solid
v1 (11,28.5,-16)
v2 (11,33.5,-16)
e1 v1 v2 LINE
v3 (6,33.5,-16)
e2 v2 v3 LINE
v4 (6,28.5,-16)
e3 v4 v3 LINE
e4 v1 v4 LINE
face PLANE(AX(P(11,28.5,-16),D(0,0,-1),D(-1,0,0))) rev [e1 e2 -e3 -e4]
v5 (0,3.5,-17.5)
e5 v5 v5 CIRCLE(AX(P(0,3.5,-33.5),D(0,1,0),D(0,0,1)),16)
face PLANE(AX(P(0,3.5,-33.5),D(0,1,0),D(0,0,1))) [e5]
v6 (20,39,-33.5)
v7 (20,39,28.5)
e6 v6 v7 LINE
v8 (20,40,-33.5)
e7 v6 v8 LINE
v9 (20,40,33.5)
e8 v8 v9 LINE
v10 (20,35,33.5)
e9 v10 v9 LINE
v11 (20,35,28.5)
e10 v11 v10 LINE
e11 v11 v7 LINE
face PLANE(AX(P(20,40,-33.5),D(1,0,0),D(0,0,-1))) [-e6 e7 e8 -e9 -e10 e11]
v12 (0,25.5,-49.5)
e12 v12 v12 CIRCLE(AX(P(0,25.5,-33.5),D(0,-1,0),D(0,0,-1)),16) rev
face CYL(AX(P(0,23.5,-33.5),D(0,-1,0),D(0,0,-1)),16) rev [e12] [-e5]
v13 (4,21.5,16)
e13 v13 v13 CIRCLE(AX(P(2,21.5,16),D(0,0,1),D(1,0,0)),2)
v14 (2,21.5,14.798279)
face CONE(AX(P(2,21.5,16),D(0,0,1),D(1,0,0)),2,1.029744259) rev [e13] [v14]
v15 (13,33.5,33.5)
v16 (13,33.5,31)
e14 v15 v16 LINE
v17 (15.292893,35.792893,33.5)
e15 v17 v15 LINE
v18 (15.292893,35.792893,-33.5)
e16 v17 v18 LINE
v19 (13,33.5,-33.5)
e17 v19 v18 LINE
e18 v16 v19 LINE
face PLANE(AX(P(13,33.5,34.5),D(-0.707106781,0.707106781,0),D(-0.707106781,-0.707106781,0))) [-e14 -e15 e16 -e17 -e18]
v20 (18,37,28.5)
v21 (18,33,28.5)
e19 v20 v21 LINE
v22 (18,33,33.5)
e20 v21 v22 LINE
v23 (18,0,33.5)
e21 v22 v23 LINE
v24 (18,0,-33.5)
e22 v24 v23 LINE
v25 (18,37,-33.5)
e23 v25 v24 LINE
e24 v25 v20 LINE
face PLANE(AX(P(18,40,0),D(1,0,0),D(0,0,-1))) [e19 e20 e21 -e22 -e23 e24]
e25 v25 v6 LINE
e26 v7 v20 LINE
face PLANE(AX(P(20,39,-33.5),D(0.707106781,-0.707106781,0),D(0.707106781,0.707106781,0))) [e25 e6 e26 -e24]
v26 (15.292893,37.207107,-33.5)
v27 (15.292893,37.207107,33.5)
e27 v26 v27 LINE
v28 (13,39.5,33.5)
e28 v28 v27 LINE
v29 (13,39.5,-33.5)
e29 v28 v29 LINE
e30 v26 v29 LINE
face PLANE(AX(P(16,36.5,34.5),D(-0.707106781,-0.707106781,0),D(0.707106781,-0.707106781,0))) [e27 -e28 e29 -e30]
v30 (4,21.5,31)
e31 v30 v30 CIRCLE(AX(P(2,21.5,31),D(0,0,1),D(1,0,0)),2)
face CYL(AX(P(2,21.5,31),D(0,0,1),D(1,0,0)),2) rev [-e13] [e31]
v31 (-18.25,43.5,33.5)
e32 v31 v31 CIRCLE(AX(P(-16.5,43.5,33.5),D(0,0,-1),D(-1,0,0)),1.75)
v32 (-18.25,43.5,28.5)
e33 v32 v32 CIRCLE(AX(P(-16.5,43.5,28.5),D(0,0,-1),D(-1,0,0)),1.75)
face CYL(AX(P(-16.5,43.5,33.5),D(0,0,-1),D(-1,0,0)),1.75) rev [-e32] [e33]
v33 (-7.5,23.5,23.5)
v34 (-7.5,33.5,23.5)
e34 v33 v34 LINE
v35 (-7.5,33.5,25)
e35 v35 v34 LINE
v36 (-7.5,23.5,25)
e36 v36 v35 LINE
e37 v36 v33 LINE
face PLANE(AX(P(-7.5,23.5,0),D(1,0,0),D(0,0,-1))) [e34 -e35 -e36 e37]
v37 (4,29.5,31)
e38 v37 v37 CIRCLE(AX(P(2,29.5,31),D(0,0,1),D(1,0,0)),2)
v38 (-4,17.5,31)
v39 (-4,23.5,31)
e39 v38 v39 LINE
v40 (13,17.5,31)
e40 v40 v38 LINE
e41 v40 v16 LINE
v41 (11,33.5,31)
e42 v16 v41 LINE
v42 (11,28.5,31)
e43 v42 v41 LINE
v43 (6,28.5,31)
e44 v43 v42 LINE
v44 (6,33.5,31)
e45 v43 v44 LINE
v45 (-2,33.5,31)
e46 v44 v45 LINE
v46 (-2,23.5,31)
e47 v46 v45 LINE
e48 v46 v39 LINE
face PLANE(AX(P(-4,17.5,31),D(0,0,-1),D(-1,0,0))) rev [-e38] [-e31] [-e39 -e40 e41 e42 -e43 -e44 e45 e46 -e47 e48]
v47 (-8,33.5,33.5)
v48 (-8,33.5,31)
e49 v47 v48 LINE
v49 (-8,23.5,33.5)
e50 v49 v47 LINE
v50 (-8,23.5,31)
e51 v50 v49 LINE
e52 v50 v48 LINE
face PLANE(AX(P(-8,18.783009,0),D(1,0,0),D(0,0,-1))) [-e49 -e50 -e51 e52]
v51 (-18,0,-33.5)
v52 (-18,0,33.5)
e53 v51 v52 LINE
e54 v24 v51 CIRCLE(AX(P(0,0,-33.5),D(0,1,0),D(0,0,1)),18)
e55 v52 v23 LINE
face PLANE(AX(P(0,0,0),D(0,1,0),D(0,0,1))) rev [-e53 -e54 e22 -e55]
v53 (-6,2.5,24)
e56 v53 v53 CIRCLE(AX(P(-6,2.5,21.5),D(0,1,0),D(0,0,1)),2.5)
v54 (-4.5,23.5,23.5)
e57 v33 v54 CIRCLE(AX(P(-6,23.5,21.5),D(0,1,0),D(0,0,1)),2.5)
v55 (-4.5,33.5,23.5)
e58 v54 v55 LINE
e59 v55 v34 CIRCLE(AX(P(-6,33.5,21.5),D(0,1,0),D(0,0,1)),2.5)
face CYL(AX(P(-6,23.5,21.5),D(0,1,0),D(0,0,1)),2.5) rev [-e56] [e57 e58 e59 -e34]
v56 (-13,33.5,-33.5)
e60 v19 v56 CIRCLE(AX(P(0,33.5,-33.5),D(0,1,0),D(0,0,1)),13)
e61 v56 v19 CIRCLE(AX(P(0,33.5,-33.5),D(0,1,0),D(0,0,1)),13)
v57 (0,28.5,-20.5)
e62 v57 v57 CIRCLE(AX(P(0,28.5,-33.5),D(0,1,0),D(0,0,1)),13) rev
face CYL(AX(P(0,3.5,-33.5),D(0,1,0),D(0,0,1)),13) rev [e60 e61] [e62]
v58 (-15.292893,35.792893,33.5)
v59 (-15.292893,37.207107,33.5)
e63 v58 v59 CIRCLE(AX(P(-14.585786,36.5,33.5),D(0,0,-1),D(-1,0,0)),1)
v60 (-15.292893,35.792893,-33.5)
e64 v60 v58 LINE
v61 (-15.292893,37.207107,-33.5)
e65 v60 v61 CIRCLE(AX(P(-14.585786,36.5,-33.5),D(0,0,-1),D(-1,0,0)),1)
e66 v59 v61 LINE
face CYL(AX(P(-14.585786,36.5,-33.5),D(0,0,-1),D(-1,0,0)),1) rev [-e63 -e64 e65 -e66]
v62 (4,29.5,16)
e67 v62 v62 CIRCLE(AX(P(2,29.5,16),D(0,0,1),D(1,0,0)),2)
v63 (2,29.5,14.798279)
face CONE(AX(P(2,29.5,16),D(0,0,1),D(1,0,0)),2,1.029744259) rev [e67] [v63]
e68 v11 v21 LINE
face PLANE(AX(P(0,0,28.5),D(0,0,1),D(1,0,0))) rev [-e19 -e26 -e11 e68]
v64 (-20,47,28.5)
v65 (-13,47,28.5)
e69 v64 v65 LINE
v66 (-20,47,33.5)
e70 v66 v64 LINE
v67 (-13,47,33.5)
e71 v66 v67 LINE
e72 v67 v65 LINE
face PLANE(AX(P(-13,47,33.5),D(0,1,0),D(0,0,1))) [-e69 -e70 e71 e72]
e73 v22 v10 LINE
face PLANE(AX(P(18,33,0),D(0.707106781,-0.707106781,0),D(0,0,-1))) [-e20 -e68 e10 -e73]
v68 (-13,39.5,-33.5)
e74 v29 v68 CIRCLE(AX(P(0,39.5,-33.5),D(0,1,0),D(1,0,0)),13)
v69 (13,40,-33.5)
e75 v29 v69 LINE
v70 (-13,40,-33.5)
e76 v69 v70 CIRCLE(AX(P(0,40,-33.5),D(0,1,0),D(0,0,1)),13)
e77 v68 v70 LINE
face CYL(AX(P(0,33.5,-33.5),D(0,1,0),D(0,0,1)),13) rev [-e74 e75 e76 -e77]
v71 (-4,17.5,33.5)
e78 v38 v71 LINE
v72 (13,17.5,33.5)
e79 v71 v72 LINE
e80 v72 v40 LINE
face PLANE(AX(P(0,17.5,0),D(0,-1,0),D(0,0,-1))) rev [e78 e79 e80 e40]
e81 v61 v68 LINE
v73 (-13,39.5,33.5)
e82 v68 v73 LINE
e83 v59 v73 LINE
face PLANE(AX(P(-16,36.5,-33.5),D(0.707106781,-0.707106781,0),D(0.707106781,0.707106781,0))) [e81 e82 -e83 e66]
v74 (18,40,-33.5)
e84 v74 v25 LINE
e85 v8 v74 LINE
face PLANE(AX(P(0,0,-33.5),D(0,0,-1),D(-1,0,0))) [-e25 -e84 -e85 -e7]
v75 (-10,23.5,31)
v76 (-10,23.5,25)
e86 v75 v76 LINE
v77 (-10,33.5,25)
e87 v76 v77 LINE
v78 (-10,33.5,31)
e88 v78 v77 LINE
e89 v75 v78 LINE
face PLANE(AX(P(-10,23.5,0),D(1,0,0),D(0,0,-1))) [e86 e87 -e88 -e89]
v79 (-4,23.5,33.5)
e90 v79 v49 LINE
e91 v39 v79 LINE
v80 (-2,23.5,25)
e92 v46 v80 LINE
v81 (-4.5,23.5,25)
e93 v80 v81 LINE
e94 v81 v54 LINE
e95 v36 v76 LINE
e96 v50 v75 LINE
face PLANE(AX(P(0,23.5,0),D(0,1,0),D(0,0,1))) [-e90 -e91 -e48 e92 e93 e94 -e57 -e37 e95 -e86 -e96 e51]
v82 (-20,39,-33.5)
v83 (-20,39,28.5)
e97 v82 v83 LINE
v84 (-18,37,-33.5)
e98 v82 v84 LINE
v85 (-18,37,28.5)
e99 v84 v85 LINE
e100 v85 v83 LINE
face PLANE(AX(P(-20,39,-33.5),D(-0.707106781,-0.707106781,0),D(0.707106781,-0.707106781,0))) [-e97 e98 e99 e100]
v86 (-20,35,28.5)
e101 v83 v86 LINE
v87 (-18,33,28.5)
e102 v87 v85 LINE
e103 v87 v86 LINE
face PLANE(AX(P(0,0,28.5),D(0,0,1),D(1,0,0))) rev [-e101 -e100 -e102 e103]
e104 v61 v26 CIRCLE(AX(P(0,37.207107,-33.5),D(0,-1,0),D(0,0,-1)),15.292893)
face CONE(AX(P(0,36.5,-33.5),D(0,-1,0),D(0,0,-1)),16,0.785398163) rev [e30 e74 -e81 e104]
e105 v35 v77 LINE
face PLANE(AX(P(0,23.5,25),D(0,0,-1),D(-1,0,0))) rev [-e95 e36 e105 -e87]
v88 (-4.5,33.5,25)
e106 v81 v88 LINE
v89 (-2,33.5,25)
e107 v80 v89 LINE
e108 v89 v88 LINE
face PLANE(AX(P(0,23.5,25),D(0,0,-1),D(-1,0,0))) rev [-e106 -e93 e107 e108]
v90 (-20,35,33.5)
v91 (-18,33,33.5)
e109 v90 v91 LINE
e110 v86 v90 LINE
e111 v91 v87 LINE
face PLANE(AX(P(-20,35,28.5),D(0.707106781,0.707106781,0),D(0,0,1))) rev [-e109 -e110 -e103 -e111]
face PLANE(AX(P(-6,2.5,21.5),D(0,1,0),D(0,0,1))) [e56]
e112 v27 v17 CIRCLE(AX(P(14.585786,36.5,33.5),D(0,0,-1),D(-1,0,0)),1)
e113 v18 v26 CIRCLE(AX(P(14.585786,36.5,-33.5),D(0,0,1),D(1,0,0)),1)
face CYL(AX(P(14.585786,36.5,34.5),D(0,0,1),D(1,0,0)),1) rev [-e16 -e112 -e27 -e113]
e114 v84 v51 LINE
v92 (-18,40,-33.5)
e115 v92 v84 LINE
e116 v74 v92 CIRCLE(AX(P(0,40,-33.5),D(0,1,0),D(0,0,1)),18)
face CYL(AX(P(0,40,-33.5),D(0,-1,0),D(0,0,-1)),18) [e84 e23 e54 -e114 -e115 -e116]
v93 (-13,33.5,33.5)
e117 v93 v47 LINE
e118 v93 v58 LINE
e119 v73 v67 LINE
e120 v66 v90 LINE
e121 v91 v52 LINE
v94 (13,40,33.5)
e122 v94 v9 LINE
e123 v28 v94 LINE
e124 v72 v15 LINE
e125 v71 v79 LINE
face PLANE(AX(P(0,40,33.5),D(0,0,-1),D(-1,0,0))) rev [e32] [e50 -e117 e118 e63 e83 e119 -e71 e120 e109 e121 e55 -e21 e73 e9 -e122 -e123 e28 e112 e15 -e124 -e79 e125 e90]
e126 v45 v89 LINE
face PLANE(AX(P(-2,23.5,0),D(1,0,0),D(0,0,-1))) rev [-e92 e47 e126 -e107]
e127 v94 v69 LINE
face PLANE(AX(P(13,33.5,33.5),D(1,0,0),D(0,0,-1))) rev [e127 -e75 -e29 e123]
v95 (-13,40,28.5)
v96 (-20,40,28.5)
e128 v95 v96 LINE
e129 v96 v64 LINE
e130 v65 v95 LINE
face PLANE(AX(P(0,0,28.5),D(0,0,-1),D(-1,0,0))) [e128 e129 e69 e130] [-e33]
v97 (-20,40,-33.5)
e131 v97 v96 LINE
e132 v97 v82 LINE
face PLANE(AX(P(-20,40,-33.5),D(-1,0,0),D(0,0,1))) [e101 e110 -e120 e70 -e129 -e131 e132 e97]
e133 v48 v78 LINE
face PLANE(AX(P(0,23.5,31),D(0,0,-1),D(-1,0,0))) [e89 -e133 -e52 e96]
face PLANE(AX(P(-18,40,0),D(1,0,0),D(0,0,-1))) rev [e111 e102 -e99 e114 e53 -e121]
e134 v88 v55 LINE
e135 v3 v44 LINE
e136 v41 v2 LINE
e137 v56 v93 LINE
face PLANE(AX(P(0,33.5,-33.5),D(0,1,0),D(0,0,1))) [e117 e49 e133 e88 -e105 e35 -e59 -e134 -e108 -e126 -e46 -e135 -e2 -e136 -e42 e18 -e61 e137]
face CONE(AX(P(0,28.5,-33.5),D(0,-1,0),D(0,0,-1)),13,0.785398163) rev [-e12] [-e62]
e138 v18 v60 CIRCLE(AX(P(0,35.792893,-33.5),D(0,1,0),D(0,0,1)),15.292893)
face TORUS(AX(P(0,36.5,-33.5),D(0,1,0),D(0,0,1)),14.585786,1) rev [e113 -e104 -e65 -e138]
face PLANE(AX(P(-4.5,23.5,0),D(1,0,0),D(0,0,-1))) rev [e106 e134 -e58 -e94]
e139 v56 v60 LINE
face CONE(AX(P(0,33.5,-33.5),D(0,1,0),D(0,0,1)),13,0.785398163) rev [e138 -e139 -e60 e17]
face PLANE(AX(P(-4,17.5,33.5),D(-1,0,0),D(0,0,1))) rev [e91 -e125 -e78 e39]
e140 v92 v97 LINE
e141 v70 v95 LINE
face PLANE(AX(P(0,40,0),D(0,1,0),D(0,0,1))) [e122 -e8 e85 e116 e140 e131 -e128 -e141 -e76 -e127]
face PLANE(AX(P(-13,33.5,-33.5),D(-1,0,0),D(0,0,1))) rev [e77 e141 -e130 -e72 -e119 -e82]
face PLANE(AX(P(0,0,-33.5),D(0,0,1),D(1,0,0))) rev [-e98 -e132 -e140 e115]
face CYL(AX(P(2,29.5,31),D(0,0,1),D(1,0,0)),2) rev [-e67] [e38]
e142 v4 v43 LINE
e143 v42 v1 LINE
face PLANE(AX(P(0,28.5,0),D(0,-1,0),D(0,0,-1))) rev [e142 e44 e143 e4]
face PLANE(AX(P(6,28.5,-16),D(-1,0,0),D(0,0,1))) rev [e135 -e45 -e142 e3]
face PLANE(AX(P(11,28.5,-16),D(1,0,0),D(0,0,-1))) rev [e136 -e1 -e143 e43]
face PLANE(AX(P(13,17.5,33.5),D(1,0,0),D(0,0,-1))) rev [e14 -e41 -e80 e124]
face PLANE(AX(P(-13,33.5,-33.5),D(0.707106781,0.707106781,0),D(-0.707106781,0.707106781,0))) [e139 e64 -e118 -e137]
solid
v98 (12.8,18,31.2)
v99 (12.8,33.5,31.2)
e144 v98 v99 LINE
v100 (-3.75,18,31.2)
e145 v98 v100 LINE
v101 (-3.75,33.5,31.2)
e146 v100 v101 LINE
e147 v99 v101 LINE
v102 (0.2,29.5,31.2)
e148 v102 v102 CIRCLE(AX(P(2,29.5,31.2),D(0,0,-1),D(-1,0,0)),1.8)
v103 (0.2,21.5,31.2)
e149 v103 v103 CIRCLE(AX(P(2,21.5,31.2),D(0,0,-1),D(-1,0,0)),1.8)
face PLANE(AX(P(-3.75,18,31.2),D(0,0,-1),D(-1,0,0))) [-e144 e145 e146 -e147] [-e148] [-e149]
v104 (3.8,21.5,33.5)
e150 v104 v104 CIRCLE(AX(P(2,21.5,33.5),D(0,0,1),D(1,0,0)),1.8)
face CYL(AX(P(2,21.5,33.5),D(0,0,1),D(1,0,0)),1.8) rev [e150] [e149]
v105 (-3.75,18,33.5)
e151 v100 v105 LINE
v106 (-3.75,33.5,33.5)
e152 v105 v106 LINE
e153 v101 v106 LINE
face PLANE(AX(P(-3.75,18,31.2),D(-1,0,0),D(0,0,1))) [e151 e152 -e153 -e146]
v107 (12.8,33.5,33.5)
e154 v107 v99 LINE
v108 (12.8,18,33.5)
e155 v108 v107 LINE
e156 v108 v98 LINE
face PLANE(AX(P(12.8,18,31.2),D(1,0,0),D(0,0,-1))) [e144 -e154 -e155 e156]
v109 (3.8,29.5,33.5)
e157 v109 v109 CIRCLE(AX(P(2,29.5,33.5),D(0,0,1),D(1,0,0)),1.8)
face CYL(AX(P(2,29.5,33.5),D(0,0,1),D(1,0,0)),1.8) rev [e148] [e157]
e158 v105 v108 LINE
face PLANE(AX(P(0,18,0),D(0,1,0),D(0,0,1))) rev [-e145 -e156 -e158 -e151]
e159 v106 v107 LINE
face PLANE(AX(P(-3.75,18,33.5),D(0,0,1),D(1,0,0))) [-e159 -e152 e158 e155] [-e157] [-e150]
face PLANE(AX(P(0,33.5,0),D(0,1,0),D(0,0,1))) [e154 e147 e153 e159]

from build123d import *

# Parameters (mm, degrees)
DODANIE_WYCI_GNI_CIE1_DEPTH         = 40
WYTNIJ_WYCI_GNI_CIE1_DEPTH          = 6.5
SZKIC6_R                            = 13
WYTNIJ_WYCI_GNI_CIE2_DEPTH          = 30
SZKIC7_R                            = 16
WYTNIJ_WYCI_GNI_CIE4_DEPTH          = 20
SFAZOWANIE1_SIZE                    = 5
SZKIC8_W                            = 5
SZKIC8_H                            = 47
WYTNIJ_WYCI_GNI_CIE5_DEPTH          = 5
ZAOKR_GLENIE2_R                     = 1
SZKIC10_W                           = 8
SZKIC10_H                           = 6
WYTNIJ_WYCI_GNI_CIE6_DEPTH          = 10
SZKIC26_R                           = 2.5
WYTNIJ_WYCI_GNI_CIE10_DEPTH         = 21
SZKIC12_W                           = 4
SZKIC12_H                           = 2.5
WYTNIJ_WYCI_GNI_CIE8_DEPTH          = 10
DODANIE_WYCI_GNI_CIE2_DEPTH         = 67
SZKIC17_W                           = 17
SZKIC17_H                           = 2.5
WYTNIJ_WYCI_GNI_CIE9_DEPTH          = 16
OTWORY_USTALAJ_CE_4_0MM5_D          = 4
OTWORY_USTALAJ_CE_4_0MM5_DEPTH      = 15
OTWORY_USTALAJ_CE_4_0MM5_TIP        = 1.201721238
SZKIC23_W                           = 16.55
SZKIC23_H                           = 2.3
DODANIE_WYCI_GNI_CIE4_DEPTH         = 15.5
OTWORY_USTALAJ_CE_4_0MM6_AT_2_COUNT = 2
OTWORY_USTALAJ_CE_4_0MM6_AT_2_PITCH = 8
DODANIE_WYCI_GNI_CIE5_DEPTH         = 5
SFAZOWANIE2_SIZE                    = 2
SZKIC29_W                           = 7
SZKIC29_H                           = 7
SZKIC29_R                           = 1.75
DODANIE_WYCI_GNI_CIE6_DEPTH         = 5


# Some blends are built 0.0001 mm under size
with BuildPart() as part:
    # Szkic1 → Dodanie-wyciągnięcie1 (new body)
    with BuildSketch(Plane(origin=(0, 0, 0), x_dir=(1, 0, 0), z_dir=(0, 1, 0))):
        with BuildLine():
            ThreePointArc((18, 33.5), (0, 15.5), (-18, 33.5))
            Line((-18, 33.5), (-18, -33.5))
            Line((-18, -33.5), (18, -33.5))
            Line((18, -33.5), (18, 33.5))
        make_face()
        with BuildLine():
            ThreePointArc((18, 33.5), (0, 51.5), (-18, 33.5))
            Line((-18, 33.5), (18, 33.5))
        make_face()
        with BuildLine():
            Line((18, 33.5), (-18, 33.5))
            ThreePointArc((-18, 33.5), (0, 15.5), (18, 33.5))
        make_face()
    extrude(amount=DODANIE_WYCI_GNI_CIE1_DEPTH)

    # Szkic2 → Wytnij-wyciągnięcie1 (cut)
    with BuildSketch(Plane(origin=(0, 40, 0), x_dir=(1, 0, 0), z_dir=(0, 1, 0))):
        with BuildLine():
            Line((-13, -33.5), (13, -33.5))
            Line((13, -33.5), (13, 33.5))
            ThreePointArc((13, 33.5), (0, 46.5), (-13, 33.5))
            Line((-13, 33.5), (-13, -33.5))
        make_face()
    extrude(amount=-WYTNIJ_WYCI_GNI_CIE1_DEPTH, mode=Mode.SUBTRACT)

    # Wycięcie-wyciągnięcie po ścieżce1: sweep along a path in Szkic5
    with BuildLine(Plane(origin=(0, 40, 0), x_dir=(1, 0, 0), z_dir=(0, 1, 0))) as wyci_cie_wyci_gni_cie_po_cie_ce1_path:
        Line((13, -33.5), (13, 33.5))
        ThreePointArc((13, 33.5), (0, 46.5), (-13, 33.5))
        Line((-13, 33.5), (-13, -33.5))
    # Szkic4 → Wycięcie-wyciągnięcie po ścieżce1 (sweep, cut)
    with BuildSketch(Plane.XY.offset(33.5)):
        Polygon((13, 33.5), (16, 36.5), (13, 39.5), align=None)
    sweep(path=wyci_cie_wyci_gni_cie_po_cie_ce1_path.line, mode=Mode.SUBTRACT)

    # Szkic6 → Wytnij-wyciągnięcie2 (cut)
    with BuildSketch(Plane(origin=(0, 33.5, 0), x_dir=(1, 0, 0), z_dir=(0, 1, 0))):
        with Locations(Location((0, 33.5, 0), (0, 0, 270))):
            Circle(SZKIC6_R)
    extrude(amount=-WYTNIJ_WYCI_GNI_CIE2_DEPTH, mode=Mode.SUBTRACT)

    # Szkic7 → Wytnij-wyciągnięcie4 (cut)
    with BuildSketch(Plane(origin=(0, 3.5, 0), x_dir=(1, 0, 0), z_dir=(0, 1, 0))):
        with Locations(Location((0, 33.5, 0), (0, 0, 270))):
            Circle(SZKIC7_R)
    extrude(amount=WYTNIJ_WYCI_GNI_CIE4_DEPTH, mode=Mode.SUBTRACT)

    # Sfazowanie1
    # the kernel refuses this chamfer: 5 mm, written as the material it takes off along each edge
    with BuildSketch(Plane(origin=(0, 23.5, -33.5), x_dir=(0, 0, 1), z_dir=(-1, 0, 0))) as sfazowanie1_piece_1_section:
        Polygon((13, SFAZOWANIE1_SIZE), (13 + SFAZOWANIE1_SIZE, 0), (13, 0), align=None)
    sfazowanie1_piece_1 = revolve(axis=Axis((0, 23.5, -33.5), (0, 1, 0)), mode=Mode.PRIVATE)
    sfazowanie1_piece_1 = sfazowanie1_piece_1 & Plane(origin=(0, 26.999564764, -33.5), x_dir=(0, 0, 1), z_dir=(0, -1, 0)) * Cylinder(16, 72, mode=Mode.PRIVATE)
    add(sfazowanie1_piece_1, mode=Mode.SUBTRACT)

    # Szkic8 → Wytnij-wyciągnięcie5 (cut)
    with BuildSketch(Plane(origin=(0, 33.5, 0), x_dir=(1, 0, 0), z_dir=(0, 1, 0))):
        with Locations((8.5, -7.5)):
            Rectangle(SZKIC8_W, SZKIC8_H)
    extrude(amount=-WYTNIJ_WYCI_GNI_CIE5_DEPTH, mode=Mode.SUBTRACT)

    # Zaokrąglenie2
    zaokr_glenie2_edges = [part.edges().sort_by_distance(p)[0] for p in [
        (16, 36.5, 0),
        (0, 36.5, -49.5),
        (-16, 36.5, 0),
    ]]
    fillet(zaokr_glenie2_edges, radius=ZAOKR_GLENIE2_R)

    # Szkic10 → Wytnij-wyciągnięcie6 (cut)
    with BuildSketch(Plane(origin=(0, 33.5, 0), x_dir=(1, 0, 0), z_dir=(0, 1, 0))):
        with Locations((-6, -28)):
            Rectangle(SZKIC10_W, SZKIC10_H)
        with BuildLine():
            ThreePointArc((-7.5, -23.5), (-6, -24), (-4.5, -23.5))
            Line((-4.5, -23.5), (-7.5, -23.5))
        make_face()
        with BuildLine():
            Line((-7.5, -23.5), (-4.5, -23.5))
            ThreePointArc((-4.5, -23.5), (-3.763932023, -22.618033989), (-3.5, -21.5))
            ThreePointArc((-3.5, -21.5), (-7.118033989, -19.263932023), (-7.5, -23.5))
        make_face()
        with BuildLine():
            Line((-7.5, -25), (-4.5, -25))
            Line((-4.5, -25), (-4.5, -23.5))
            ThreePointArc((-4.5, -23.5), (-6, -24), (-7.5, -23.5))
            Line((-7.5, -23.5), (-7.5, -25))
        make_face()
    extrude(amount=-WYTNIJ_WYCI_GNI_CIE6_DEPTH, mode=Mode.SUBTRACT)

    # Szkic26 → Wytnij-wyciągnięcie10 (cut)
    with BuildSketch(Plane(origin=(0, 23.5, 0), x_dir=(1, 0, 0), z_dir=(0, 1, 0))):
        with Locations(Location((-6, -21.5, 0), (0, 0, 270))):
            Circle(SZKIC26_R)
    extrude(amount=-WYTNIJ_WYCI_GNI_CIE10_DEPTH, mode=Mode.SUBTRACT)

    # Szkic12 → Wytnij-wyciągnięcie8 (cut)
    with BuildSketch(Plane(origin=(0, 33.5, 0), x_dir=(1, 0, 0), z_dir=(0, 1, 0))):
        with Locations((-6, -32.25)):
            Rectangle(SZKIC12_W, SZKIC12_H)
    extrude(amount=-WYTNIJ_WYCI_GNI_CIE8_DEPTH, mode=Mode.SUBTRACT)

    # Szkic13 → Dodanie-wyciągnięcie2 (add)
    with BuildSketch(Plane.XY.offset(33.5)):
        Polygon((-18, 40), (-20, 40), (-20, 39), (-18, 37), align=None)
        Polygon((18, 37), (18, 40), (20, 40), (20, 39), align=None)
    extrude(amount=-DODANIE_WYCI_GNI_CIE2_DEPTH)

    # Szkic17 → Wytnij-wyciągnięcie9 (cut)
    with BuildSketch(Plane(origin=(0, 33.5, 0), x_dir=(1, 0, 0), z_dir=(0, 1, 0))):
        with Locations((4.5, -32.25)):
            Rectangle(SZKIC17_W, SZKIC17_H)
    extrude(amount=-WYTNIJ_WYCI_GNI_CIE9_DEPTH, mode=Mode.SUBTRACT)

    # Otwory ustalające Ø4.0mm5
    with Locations(Plane.XY.offset(31)):
        with Locations((2, 29.5), (2, 21.5)):
            Hole(OTWORY_USTALAJ_CE_4_0MM5_D / 2, depth=OTWORY_USTALAJ_CE_4_0MM5_DEPTH)
            with Locations((0, 0, -(OTWORY_USTALAJ_CE_4_0MM5_DEPTH + OTWORY_USTALAJ_CE_4_0MM5_TIP / 2))):  # 118° drill point
                Cone(0, OTWORY_USTALAJ_CE_4_0MM5_D / 2, OTWORY_USTALAJ_CE_4_0MM5_TIP, mode=Mode.SUBTRACT)

    # Szkic27 → Dodanie-wyciągnięcie5 (add)
    with BuildSketch(Plane.XY.offset(33.5)):
        Polygon((-20, 39), (-20, 35), (-18, 35), (-18, 37), align=None)
        Polygon((18, 37), (20, 39), (20, 35), (18, 35), align=None)
    extrude(amount=-DODANIE_WYCI_GNI_CIE5_DEPTH)

    # Sfazowanie2
    sfazowanie2_edges = [part.edges().sort_by_distance(p)[0] for p in [
        (18, 35, 31),
        (-18, 35, 31),
    ]]
    chamfer(sfazowanie2_edges, length=SFAZOWANIE2_SIZE - 0.0001)  # a hair under: the kernel refuses the full size

    # Szkic29 → Dodanie-wyciągnięcie6 (add)
    with BuildSketch(Plane(origin=(0, 0, 28.5), x_dir=(-1, 0, 0), z_dir=(0, 0, -1))):
        with Locations((16.5, 43.5)):
            Rectangle(SZKIC29_W, SZKIC29_H)
        with Locations((16.5, 43.5)):
            Circle(SZKIC29_R, mode=Mode.SUBTRACT)
    extrude(amount=-DODANIE_WYCI_GNI_CIE6_DEPTH)


with BuildPart() as body_2:
    # Szkic23 → Dodanie-wyciągnięcie4 (new body)
    with BuildSketch(Plane(origin=(0, 33.5, 0), x_dir=(1, 0, 0), z_dir=(0, 1, 0))):
        with Locations((4.525, -32.35)):
            Rectangle(SZKIC23_W, SZKIC23_H)
    extrude(amount=-DODANIE_WYCI_GNI_CIE4_DEPTH)

    # Szkic25 → Otwory ustalające Ø4.0mm6 (revolve, cut)
    with BuildSketch(Plane(origin=(2, 21.5, 33.5), x_dir=(0, -1, 0), z_dir=(1, 0, 0))):
        Polygon((0, 0), (0, 16.081549114), (1.8, 15), (1.8, 0), align=None)
    otwory_ustalaj_ce_4_0mm6 = revolve(axis=Axis((2, 21.5, 39.85), (0, 0, -1)), mode=Mode.SUBTRACT)

    # Otwory ustalające Ø4.0mm6 at 2: Otwory ustalające Ø4.0mm6 ×2
    with Locations(*[(0, i * OTWORY_USTALAJ_CE_4_0MM6_AT_2_PITCH, 0) for i in range(1, OTWORY_USTALAJ_CE_4_0MM6_AT_2_COUNT)]):
        add(otwory_ustalaj_ce_4_0mm6, mode=Mode.SUBTRACT)


solid = Compound([part.part, body_2.part])
